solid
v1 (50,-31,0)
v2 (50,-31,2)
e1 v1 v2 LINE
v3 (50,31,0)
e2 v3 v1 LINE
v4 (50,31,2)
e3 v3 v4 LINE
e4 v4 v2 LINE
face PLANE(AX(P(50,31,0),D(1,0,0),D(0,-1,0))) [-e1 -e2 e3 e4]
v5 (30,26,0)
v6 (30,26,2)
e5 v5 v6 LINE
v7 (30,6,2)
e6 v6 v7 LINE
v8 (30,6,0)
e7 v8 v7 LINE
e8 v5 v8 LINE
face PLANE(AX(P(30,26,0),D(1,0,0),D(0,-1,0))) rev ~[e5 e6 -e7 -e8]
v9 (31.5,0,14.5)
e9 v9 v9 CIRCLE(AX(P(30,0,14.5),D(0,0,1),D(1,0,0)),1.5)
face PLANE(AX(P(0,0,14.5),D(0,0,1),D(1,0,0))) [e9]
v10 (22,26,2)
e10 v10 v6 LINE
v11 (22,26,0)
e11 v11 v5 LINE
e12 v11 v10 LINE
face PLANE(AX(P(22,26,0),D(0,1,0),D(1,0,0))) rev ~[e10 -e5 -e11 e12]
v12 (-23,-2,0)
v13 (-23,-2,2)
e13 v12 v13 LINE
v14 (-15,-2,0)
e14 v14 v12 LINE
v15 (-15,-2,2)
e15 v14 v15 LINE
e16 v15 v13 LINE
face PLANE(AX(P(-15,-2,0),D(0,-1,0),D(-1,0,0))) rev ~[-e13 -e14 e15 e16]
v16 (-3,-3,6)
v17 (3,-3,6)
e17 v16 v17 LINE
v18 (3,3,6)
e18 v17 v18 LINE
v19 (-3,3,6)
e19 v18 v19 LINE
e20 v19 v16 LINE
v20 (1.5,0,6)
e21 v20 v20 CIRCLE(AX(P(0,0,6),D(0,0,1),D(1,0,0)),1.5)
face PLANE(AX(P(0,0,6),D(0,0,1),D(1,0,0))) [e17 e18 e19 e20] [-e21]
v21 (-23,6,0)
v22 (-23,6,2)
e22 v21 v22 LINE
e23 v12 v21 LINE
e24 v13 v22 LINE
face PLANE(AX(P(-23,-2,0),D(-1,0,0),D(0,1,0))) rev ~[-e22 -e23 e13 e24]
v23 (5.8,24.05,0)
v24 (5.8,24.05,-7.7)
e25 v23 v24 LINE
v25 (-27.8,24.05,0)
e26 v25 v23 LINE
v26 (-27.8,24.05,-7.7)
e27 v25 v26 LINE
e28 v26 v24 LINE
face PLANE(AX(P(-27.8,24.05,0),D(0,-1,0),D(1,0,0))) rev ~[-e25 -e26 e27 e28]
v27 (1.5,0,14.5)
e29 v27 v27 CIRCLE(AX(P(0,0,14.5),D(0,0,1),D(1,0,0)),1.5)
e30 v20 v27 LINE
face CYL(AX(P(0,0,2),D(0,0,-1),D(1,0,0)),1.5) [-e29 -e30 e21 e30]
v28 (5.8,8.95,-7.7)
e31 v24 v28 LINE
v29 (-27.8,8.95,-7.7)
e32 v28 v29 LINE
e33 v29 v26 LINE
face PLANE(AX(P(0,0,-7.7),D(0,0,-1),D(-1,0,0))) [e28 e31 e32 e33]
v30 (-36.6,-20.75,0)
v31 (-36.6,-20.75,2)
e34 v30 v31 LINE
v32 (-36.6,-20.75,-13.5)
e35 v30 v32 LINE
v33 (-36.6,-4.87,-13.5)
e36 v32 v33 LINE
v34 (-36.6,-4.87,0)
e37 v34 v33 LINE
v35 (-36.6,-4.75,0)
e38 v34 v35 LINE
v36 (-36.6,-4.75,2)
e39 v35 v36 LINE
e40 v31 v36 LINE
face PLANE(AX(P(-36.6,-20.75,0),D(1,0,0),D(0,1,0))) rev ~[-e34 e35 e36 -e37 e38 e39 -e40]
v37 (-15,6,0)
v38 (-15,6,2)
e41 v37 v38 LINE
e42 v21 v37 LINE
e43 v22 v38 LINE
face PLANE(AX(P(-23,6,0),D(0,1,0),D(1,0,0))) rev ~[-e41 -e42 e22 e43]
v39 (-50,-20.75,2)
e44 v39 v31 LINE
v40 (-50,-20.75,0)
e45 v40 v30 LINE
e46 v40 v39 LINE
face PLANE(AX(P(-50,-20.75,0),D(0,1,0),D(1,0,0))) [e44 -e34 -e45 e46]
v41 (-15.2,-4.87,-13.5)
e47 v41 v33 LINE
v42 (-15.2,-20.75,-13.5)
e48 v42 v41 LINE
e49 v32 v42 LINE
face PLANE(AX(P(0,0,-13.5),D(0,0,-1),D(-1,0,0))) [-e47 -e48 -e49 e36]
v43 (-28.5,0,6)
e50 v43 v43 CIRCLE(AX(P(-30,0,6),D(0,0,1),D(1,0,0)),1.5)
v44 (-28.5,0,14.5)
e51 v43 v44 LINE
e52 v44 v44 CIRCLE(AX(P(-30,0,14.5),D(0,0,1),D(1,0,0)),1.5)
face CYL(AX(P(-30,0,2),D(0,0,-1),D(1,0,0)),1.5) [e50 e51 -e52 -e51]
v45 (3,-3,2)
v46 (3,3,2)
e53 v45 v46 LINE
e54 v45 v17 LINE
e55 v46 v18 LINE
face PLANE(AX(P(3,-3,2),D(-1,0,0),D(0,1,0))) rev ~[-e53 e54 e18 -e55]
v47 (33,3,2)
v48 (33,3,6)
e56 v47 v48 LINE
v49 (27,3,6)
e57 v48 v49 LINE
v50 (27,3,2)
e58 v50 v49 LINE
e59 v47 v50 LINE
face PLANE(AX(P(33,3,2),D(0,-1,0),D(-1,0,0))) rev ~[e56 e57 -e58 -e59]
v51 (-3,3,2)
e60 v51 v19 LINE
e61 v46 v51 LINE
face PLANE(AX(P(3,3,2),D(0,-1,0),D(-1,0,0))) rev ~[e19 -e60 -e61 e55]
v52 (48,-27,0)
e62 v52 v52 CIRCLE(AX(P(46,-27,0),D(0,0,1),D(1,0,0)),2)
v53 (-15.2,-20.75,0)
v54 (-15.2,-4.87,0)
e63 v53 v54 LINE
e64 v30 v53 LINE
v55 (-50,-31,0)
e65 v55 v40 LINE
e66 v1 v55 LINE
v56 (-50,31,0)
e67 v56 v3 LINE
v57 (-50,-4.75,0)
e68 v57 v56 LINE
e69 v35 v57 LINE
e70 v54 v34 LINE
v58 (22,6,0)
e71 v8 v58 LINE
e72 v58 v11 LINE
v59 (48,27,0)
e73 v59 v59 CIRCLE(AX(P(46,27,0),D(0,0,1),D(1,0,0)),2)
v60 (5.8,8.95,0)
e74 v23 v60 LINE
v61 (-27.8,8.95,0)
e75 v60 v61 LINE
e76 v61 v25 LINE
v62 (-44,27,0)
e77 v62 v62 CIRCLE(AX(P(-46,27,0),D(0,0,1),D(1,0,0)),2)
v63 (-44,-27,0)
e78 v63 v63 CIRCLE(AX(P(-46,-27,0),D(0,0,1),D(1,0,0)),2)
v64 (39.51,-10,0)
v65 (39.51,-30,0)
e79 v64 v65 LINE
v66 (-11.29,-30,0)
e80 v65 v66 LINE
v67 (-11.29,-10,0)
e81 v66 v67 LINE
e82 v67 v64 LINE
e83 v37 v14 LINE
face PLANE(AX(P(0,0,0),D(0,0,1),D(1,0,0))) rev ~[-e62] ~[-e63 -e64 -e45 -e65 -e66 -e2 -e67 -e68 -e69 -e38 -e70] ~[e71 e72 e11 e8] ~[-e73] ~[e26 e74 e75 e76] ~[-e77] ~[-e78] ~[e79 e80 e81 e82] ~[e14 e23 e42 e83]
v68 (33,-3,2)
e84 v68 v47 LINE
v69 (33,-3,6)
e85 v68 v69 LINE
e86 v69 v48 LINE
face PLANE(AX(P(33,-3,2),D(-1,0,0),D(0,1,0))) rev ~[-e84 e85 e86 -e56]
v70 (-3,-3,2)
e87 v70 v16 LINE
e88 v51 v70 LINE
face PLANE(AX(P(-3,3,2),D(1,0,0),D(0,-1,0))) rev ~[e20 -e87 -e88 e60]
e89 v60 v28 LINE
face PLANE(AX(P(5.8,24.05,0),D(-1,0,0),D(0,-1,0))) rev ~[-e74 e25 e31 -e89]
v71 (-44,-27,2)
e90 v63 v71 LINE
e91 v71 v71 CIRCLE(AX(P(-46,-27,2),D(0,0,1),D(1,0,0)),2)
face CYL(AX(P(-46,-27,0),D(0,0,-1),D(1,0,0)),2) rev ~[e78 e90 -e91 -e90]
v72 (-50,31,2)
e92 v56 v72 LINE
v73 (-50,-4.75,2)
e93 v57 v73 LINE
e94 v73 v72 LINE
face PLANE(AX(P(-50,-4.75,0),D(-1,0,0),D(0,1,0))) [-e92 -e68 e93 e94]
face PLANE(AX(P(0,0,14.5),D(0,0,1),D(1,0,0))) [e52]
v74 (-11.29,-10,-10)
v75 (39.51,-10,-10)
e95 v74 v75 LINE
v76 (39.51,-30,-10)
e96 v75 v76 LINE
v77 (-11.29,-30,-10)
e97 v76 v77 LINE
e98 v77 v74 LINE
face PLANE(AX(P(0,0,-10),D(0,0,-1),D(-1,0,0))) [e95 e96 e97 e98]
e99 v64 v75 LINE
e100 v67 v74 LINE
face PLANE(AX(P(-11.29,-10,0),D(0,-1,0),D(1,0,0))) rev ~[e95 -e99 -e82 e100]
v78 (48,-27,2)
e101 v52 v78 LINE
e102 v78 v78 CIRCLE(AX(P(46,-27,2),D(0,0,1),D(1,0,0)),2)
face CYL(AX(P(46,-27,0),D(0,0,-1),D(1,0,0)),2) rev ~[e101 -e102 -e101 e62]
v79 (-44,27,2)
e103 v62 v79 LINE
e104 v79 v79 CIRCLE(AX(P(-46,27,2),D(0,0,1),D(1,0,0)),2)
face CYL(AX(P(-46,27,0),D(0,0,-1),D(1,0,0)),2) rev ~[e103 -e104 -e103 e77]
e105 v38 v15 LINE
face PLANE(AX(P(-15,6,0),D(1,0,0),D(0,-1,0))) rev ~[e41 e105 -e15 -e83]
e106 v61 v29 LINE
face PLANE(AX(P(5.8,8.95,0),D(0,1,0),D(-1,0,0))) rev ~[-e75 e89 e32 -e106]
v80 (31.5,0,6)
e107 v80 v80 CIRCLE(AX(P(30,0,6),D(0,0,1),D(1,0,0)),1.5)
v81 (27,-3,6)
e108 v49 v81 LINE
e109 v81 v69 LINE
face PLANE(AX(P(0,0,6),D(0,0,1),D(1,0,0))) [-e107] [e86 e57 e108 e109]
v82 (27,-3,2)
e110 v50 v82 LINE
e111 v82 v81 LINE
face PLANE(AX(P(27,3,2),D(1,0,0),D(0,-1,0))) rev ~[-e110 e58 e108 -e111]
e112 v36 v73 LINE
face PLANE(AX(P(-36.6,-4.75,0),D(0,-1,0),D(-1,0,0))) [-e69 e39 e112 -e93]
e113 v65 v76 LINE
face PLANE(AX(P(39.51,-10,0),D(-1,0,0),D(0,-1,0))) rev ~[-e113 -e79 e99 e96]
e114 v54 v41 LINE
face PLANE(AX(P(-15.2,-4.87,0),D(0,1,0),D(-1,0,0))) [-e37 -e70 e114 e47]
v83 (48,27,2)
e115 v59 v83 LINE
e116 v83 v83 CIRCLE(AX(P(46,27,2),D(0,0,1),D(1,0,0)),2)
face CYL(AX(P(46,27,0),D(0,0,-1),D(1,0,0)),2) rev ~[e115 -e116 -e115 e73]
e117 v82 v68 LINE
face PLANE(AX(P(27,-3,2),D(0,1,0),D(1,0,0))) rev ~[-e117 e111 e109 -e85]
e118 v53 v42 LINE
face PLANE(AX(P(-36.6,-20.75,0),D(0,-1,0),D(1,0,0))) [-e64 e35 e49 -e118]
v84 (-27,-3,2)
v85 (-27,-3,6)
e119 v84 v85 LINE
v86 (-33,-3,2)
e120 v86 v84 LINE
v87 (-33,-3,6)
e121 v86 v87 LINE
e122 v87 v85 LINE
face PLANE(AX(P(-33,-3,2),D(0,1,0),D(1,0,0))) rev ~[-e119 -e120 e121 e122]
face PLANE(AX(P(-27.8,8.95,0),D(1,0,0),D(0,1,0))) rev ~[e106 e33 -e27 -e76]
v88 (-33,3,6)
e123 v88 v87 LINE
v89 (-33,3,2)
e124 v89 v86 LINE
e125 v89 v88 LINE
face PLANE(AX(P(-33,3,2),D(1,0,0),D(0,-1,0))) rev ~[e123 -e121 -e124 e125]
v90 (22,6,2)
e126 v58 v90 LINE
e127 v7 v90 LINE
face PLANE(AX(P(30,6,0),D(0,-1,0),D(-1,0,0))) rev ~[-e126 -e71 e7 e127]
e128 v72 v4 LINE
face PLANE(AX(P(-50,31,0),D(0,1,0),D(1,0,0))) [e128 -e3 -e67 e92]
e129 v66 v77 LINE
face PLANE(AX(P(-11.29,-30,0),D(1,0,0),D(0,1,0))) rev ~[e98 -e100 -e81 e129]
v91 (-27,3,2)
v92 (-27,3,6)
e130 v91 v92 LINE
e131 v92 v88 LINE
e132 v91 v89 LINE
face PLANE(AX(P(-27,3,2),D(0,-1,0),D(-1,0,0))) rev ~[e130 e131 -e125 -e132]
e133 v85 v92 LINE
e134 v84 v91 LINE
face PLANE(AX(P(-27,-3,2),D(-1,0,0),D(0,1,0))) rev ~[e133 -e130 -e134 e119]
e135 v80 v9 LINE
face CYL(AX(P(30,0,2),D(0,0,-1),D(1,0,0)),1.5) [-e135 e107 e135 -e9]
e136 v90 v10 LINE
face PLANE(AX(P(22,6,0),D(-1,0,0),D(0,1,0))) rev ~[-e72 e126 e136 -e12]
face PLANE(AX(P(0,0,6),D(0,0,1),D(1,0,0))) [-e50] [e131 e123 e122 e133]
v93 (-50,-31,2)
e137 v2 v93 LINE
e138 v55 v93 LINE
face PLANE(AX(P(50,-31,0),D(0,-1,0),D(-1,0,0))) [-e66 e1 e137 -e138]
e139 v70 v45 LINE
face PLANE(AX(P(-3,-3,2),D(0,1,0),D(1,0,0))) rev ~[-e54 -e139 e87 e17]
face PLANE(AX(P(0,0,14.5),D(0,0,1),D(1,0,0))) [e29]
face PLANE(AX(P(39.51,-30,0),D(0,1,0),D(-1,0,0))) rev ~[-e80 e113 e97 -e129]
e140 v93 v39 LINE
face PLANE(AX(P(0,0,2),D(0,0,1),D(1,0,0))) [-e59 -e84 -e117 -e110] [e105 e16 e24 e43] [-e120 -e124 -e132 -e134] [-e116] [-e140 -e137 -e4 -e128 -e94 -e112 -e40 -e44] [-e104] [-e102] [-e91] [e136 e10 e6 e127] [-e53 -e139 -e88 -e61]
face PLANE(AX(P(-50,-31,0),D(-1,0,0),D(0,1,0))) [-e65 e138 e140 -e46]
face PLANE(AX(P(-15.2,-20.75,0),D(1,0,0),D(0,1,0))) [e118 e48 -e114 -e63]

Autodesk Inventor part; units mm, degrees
ref_plane "YZ Plane" through (0, 0, 0) normal (1, 0, 0) x (0, 1, 0)
ref_plane "XZ Plane" through (0, 0, 0) normal (0, 1, 0) x (-1, 0, 0)
ref_plane "XY Plane" through (0, 0, 0) normal (0, 0, 1) x (1, 0, 0)
sketch "Pushbutton" plane through (0, 0, 0) normal (0, 0, 1) x (1, 0, 0)
  line L0 (-3, -3) -> (3, -3)
  line L1 (3, -3) -> (3, 3)
  line L2 (3, 3) -> (-3, 3)
  line L3 (-3, 3) -> (-3, -3)
  line L4 (-3, -3) -> (3, 3) construction
  line L5 (3, -3) -> (-3, 3) construction
  circle A0 centre (0, 0) radius 1.5
  dimension "d26" = 6
  dimension "d28" = 6
  dimension "d29" = 3
sketch "Grundriss Platine" plane through (0, 0, 0) normal (0, 0, 1) x (1, 0, 0)
  line L0 (50, -31) -> (-50, -31)
  line L1 (-50, -31) -> (-50, 31)
  line L2 (-50, 31) -> (50, 31)
  line L3 (50, 31) -> (50, -31)
  line L4 (50, -31) -> (-50, 31) construction
  line L5 (-50, -31) -> (50, 31) construction
  line L6 (46, -28.52) -> (-46, -28.52) construction
  line L7 (46, -28.52) -> (-46, 28.52) construction
  line L8 (-46, -28.52) -> (46, 28.52) construction
  circle A0 centre (-46, -27) radius 2
  circle A1 centre (46, -27) radius 2
  circle A2 centre (-46, 27) radius 2
  circle A3 centre (46, 27) radius 2
  line L9 (-50, -20.75) -> (-36.6, -20.75)
  line L10 (-36.6, -20.75) -> (-36.6, -4.75)
  line L11 (-36.6, -4.75) -> (-50, -4.75)
  line L12 (-50, -4.75) -> (-50, -20.75)
  line L13 (-23, 6) -> (-15, 6)
  line L14 (-15, 6) -> (-15, -2)
  line L15 (-15, -2) -> (-23, -2)
  line L16 (-23, -2) -> (-23, 6)
  line L17 (30, 6) -> (22, 6)
  line L18 (22, 6) -> (22, 26)
  line L19 (22, 26) -> (30, 26)
  line L20 (30, 26) -> (30, 6)
  point P0 (0, 0)
  dimension "Platine_Breite" = 100
  dimension "Platine_Hoehe" = 62
  dimension "d4" = 4
  dimension "d5" = 4
  dimension "d6" = 4
  dimension "d7" = 4
  dimension "d8" = 4
  dimension "d9" = 4
  dimension "d10" = 4
  dimension "d11" = 4
  dimension "d12" = 4
  dimension "d13" = 10.25
  dimension "d14" = 13.4
  dimension "d15" = 26.25
  dimension "d16" = 29
  dimension "d17" = 27
  dimension "d18" = 8
  dimension "d19" = 8
  dimension "d20" = 37
  dimension "d21" = 8
  dimension "d22" = 72
  dimension "d23" = 20
extrude "Extrusion1" add sketch "Grundriss Platine" along normal blind 2 contours L0 L1 L9 L10 L11 L2 L3
sketch "Bauteile Oberseite" plane through (0, 0, 2) normal (0, 0, 1) x (1, 0, 0)
  line L0 (-50, -31) -> (50, -31) projected
  line L1 (50, -31) -> (50, 31) projected
  line L2 (50, 31) -> (-50, 31) projected
  line L3 (-50, 31) -> (-50, -4.75) projected
  line L4 (-23, 6) -> (-15, 6) projected
  line L5 (-50, 0) -> (50, 0) construction
  line L6 (0, 31) -> (0, -31) construction
  line L7 (-3, -3) -> (3, -3)
  line L8 (3, -3) -> (3, 3)
  line L9 (3, 3) -> (-3, 3)
  line L10 (-3, 3) -> (-3, -3)
  line L11 (-3, -3) -> (3, 3) construction
  line L12 (3, -3) -> (-3, 3) construction
  circle A0 centre (0, 0) radius 1.5
  line L13 (-33, -3) -> (-27, -3)
  line L14 (-27, -3) -> (-27, 3)
  line L15 (-27, 3) -> (-33, 3)
  line L16 (-33, 3) -> (-33, -3)
  line L17 (-33, -3) -> (-27, 3) construction
  line L18 (-27, -3) -> (-33, 3) construction
  circle A1 centre (-30, 0) radius 1.5
  line L19 (27, -3) -> (33, -3)
  line L20 (33, -3) -> (33, 3)
  line L21 (33, 3) -> (27, 3)
  line L22 (27, 3) -> (27, -3)
  line L23 (27, -3) -> (33, 3) construction
  line L24 (33, -3) -> (27, 3) construction
  circle A2 centre (30, 0) radius 1.5
  point P0 (-30, 0)
  point P1 (0, 0)
  point P2 (30, 0)
  dimension "d30" = 30
  dimension "d31" = 30
extrude "Extrusion2" add sketch "Bauteile Oberseite" along normal blind 4
extrude "Extrusion3" add sketch "Bauteile Oberseite" along normal blind 12.5 contours A0 | A1 | A2
sketch "Bauteile Unterseite" plane through (0, 0, 0) normal (0, 0, -1) x (-1, 0, 0)
  line L0 (50, -20.75) -> (36.6, -20.75) projected
  line L1 (36.6, -20.75) -> (36.6, -4.75) projected
  line L2 (50, 31) -> (50, -4.75) projected
  line L3 (50, -31) -> (-50, -31) projected
  line L4 (50, -20.75) -> (50, -31) projected
  line L5 (36.6, -20.75) -> (15.2, -20.75)
  line L6 (15.2, -20.75) -> (15.2, -4.87)
  line L7 (15.2, -4.87) -> (36.6, -4.87)
  line L8 (36.6, -4.87) -> (36.6, -20.75)
  line L9 (-39.51, -30) -> (11.29, -30)
  line L10 (11.29, -30) -> (11.29, -10)
  line L11 (11.29, -10) -> (-39.51, -10)
  line L12 (-39.51, -10) -> (-39.51, -30)
  line L13 (-39.51, -30) -> (11.29, -10) construction
  line L14 (11.29, -30) -> (-39.51, -10) construction
  line L15 (27.8, 24.05) -> (-5.8, 24.05)
  line L16 (-5.8, 24.05) -> (-5.8, 8.95)
  line L17 (-5.8, 8.95) -> (27.8, 8.95)
  line L18 (27.8, 8.95) -> (27.8, 24.05)
  line L19 (27.8, 24.05) -> (-5.8, 8.95) construction
  line L20 (-5.8, 24.05) -> (27.8, 8.95) construction
  point P0 (0, 0)
  point P1 (-14.11, -20)
  point P2 (11, 16.5)
  dimension "d37" = 15.88
  dimension "d39" = 21.4
  dimension "d40" = 64.11
  dimension "d41" = 11
  dimension "d42" = 20
  dimension "d43" = 50.8
  dimension "d44" = 39
  dimension "d45" = 47.5
  dimension "d46" = 15.1
  dimension "d47" = 33.6
extrude "Extrusion4" add sketch "Bauteile Unterseite" along normal blind 7.7 contours L18 L17 L16 L15
extrude "Extrusion5" add sketch "Bauteile Unterseite" along normal blind 13.5 contours L5 L6 L7 L1
extrude "Extrusion6" add sketch "Bauteile Unterseite" along normal blind 10 contours L12 L11 L10 L9
equation "\"d24\" = Platine_Dicke"
equation "\"d31\" = d30"
equation "\"Platine_Dicke\" = 2"
equation "\"epsilon\" = 0.1"
equation "\"Wandstaerke\" = 3"
equation "\"Freimass\" = 3"
properties part number "PCB-Model"
